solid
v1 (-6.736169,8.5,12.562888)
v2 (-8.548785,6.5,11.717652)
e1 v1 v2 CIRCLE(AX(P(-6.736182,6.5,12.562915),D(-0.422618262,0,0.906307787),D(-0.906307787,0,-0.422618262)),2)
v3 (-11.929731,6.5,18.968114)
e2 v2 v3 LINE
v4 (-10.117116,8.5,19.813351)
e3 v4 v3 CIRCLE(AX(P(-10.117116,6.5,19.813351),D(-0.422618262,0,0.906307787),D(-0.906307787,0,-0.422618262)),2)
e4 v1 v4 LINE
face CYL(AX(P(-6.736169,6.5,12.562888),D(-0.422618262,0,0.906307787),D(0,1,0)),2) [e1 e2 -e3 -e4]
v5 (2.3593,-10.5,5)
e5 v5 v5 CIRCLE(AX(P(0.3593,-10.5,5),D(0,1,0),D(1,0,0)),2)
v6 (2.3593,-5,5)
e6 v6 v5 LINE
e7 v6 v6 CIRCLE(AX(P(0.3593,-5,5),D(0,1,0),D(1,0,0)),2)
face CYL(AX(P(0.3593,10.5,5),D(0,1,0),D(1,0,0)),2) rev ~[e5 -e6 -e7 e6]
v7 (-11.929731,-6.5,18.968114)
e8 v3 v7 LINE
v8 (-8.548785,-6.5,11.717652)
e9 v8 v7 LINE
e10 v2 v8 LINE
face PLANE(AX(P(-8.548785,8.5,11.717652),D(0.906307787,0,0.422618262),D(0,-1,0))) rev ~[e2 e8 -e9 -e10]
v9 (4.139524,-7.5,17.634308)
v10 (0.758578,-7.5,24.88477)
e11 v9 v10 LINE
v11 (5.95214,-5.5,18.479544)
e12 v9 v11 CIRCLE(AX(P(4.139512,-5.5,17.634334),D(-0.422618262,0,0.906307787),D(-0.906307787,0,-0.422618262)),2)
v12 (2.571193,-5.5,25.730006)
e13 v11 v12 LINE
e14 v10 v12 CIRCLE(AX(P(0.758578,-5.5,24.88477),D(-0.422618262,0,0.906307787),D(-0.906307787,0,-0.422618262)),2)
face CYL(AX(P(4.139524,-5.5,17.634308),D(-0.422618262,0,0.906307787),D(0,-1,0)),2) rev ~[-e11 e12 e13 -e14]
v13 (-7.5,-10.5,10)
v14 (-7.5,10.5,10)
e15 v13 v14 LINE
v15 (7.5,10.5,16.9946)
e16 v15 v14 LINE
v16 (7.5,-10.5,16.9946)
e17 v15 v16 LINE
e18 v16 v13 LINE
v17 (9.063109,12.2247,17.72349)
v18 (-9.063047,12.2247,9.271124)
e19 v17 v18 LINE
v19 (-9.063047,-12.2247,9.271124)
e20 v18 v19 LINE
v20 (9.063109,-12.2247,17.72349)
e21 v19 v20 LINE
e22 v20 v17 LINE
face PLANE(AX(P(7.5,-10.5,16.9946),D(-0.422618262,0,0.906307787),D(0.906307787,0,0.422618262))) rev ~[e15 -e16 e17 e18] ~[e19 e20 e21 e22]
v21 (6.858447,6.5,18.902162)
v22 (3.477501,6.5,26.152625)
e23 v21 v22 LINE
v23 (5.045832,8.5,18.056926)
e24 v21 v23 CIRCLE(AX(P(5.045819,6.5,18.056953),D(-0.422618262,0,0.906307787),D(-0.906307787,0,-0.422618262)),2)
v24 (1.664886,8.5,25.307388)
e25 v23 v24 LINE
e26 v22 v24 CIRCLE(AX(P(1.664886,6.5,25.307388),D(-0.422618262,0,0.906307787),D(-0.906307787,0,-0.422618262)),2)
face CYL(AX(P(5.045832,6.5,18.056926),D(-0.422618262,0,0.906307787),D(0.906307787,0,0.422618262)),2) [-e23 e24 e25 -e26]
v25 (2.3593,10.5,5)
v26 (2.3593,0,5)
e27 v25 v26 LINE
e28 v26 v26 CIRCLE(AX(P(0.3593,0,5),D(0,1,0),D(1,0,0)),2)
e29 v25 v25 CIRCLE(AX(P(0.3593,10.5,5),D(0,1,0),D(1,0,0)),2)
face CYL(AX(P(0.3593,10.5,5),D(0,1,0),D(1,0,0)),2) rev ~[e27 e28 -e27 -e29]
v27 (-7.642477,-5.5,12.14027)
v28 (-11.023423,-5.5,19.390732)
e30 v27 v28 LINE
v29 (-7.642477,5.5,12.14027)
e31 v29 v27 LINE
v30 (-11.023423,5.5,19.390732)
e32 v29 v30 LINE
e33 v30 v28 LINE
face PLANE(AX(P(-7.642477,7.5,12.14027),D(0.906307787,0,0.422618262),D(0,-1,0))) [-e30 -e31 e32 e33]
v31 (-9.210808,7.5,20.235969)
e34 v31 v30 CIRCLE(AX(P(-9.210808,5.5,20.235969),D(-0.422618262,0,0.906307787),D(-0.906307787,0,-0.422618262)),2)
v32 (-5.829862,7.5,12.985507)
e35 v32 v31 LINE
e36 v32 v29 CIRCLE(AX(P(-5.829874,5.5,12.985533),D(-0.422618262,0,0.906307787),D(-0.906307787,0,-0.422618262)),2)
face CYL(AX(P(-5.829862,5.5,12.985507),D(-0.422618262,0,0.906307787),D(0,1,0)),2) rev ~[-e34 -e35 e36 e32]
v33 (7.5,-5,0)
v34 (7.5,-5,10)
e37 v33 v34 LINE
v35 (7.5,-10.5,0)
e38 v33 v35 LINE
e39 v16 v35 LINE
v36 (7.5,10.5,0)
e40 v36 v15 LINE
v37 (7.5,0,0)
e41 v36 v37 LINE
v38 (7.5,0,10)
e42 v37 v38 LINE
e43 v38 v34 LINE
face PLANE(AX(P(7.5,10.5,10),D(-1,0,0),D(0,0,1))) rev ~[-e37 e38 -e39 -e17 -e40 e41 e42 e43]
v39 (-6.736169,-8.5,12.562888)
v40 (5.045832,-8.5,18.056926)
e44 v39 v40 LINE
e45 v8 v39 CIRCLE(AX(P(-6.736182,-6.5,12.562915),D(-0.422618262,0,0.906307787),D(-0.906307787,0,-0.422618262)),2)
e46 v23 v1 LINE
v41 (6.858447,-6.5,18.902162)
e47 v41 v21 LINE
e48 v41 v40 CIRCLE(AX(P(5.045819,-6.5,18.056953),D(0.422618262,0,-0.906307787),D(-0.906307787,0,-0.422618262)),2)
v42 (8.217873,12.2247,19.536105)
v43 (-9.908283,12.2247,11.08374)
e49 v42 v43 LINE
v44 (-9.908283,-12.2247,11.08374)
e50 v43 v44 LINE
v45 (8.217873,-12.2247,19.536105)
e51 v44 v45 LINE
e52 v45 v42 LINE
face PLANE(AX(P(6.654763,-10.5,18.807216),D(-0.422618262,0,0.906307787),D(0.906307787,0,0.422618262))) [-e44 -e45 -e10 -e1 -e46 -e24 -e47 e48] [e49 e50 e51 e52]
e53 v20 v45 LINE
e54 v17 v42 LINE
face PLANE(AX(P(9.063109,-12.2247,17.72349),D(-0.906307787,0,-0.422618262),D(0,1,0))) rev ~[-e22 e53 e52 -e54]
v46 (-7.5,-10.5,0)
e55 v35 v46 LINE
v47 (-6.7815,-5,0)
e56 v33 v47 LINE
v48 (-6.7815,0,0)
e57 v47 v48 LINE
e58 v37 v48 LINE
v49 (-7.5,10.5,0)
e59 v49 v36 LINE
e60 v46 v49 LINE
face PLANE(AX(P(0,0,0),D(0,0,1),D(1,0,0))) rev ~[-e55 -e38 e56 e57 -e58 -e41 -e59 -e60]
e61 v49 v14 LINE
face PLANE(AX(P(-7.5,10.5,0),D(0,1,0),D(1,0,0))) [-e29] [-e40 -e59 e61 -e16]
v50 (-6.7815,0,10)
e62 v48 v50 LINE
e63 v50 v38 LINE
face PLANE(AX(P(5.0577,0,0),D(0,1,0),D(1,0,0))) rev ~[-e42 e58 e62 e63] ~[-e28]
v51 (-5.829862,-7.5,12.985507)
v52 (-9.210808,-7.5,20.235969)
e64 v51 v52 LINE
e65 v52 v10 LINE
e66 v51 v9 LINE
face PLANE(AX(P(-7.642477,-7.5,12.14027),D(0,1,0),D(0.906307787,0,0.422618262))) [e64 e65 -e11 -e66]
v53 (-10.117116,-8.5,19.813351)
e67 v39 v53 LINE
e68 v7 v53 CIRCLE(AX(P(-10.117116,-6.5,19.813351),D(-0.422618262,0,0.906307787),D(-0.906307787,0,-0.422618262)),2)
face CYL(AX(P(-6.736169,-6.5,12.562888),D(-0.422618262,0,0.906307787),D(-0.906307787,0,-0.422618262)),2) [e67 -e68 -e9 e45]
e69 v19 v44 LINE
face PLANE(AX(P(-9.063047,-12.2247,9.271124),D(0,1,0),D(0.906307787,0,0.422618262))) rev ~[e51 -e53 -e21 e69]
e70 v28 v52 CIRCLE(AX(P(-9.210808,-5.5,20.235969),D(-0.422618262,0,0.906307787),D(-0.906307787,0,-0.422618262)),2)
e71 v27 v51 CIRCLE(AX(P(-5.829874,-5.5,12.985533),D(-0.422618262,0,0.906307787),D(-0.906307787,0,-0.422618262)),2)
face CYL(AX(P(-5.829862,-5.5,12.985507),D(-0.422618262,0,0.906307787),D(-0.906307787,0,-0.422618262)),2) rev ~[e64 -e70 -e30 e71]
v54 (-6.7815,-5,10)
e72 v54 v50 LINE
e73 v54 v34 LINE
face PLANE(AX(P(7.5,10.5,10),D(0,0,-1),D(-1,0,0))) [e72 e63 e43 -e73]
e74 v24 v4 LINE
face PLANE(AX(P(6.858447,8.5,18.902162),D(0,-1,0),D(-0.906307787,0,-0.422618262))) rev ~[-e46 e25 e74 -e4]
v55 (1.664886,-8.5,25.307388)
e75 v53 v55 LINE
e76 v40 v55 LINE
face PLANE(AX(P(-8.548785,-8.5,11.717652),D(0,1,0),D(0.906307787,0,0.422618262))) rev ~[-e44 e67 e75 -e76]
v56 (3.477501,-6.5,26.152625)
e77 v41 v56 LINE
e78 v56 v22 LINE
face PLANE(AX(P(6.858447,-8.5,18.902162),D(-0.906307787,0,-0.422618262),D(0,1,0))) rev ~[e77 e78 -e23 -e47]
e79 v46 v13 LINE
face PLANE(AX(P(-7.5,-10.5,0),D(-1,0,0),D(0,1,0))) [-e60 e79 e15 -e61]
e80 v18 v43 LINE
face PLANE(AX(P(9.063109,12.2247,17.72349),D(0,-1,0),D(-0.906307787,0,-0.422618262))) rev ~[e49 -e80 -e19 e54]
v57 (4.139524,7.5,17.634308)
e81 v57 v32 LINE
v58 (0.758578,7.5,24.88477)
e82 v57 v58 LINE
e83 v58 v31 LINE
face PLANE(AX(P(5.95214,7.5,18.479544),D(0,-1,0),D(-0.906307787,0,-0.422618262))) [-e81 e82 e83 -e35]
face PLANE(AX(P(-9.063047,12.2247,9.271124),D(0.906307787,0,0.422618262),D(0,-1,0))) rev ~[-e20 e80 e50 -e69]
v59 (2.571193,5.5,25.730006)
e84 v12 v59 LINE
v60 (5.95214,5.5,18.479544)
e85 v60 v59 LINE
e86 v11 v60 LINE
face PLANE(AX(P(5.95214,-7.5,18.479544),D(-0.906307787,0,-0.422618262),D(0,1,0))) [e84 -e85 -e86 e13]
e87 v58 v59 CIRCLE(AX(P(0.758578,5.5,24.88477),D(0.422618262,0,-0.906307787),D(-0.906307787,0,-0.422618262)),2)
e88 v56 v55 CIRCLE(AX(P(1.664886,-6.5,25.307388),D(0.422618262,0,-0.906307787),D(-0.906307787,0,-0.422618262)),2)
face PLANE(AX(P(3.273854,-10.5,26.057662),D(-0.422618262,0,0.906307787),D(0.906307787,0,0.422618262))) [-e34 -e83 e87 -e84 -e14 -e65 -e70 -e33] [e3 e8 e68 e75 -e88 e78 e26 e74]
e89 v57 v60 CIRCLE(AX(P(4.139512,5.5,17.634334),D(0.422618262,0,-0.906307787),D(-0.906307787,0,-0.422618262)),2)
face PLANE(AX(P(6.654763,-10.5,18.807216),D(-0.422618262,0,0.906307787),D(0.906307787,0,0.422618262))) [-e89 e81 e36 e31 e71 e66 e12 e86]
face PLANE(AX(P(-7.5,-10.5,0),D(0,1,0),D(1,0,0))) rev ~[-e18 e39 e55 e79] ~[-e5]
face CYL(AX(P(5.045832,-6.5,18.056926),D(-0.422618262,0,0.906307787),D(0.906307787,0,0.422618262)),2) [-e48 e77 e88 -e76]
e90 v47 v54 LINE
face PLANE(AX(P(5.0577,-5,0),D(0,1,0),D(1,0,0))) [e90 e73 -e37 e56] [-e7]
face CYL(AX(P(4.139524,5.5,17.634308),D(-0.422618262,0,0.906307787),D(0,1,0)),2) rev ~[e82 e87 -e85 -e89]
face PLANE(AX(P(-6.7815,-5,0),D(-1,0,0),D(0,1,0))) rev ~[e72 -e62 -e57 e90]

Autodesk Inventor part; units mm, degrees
ref_plane "YZ Plane" through (0, 0, 0) normal (1, 0, 0) x (0, 1, 0)
ref_plane "XZ Plane" through (0, 0, 0) normal (0, 1, 0) x (-1, 0, 0)
ref_plane "XY Plane" through (0, 0, 0) normal (0, 0, 1) x (1, 0, 0)
sketch "Эскиз1" plane through (0, 0, 0) normal (0, 0, 1) x (1, 0, 0)
  line L0 (7.5, -5) -> (7.5, 0) projected
  line L1 (5.0577, -5) -> (7.5, -5) projected
  line L2 (5.0577, -5) -> (-4.3392, -5) projected
  line L3 (-6.7815, -5) -> (-4.3392, -5) projected
  line L4 (-6.7815, -5) -> (-6.7815, 0) projected
  line L5 (-6.7815, 0) -> (-4.3392, 0) projected
  line L6 (5.0577, 0) -> (-4.3392, 0) projected
  line L7 (5.0577, 0) -> (7.5, 0) projected
  line L8 (7.5, -10.5) -> (-7.5, -10.5) projected
  line L9 (7.5, 0) -> (-6.7815, 0) projected
  line L10 (7.5, 10.5) -> (7.5, 0) projected
  line L11 (-7.5, 10.5) -> (7.5, 10.5) projected
  line L12 (-7.5, -10.5) -> (-7.5, 10.5) projected
  line L13 (7.5, -10.5) -> (-7.5, -10.5) projected
  line L14 (7.5, -5) -> (7.5, -10.5) projected
  line L15 (7.5, -5) -> (-6.7815, -5) projected
  line L16 (-6.7815, -5) -> (-6.7815, 0) projected
  point P0 (0, 0)
extrude "Выдавливание1" add sketch "Эскиз1" along normal blind 10 contours L14 L8 L12 L11 L10 L7 L6 L5 L4 L3 L2 L1
sketch "Эскиз2" plane through (-7.5, 10.5, 0) normal (0, 1, 0) x (1, 0, 0)
  circle A0 centre (7.8593, -5) radius 2 projected
  point P0 (7.5, 0)
extrude "Выдавливание2" cut sketch "Эскиз2" against normal through all
sketch "Эскиз3" plane through (-7.5, 10.5, 0) normal (0, 1, 0) x (1, 0, 0)
  line L0 (15, -10) -> (0, -10) projected
  line L1 (15, -10) -> (15, -16.9946)
  line L2 (15, -16.9946) -> (0, -10)
  point P0 (7.5, 0)
  dimension "d5" = 25
extrude "Выдавливание3" add sketch "Эскиз3" against normal up to surface (21 mm away)
sketch "Эскиз4" plane through (7.5, -10.5, 16.9946) normal (-0.4226183, 0, 0.9063078) x (0.9063078, 0, 0.4226183)
  line L0 (-16.5507, 0) -> (0, 0) projected
  line L1 (0, 21) -> (0, 0) projected
  line L2 (-16.5507, 21) -> (0, 21) projected
  line L3 (-16.5507, 21) -> (-16.5507, 0) projected
  line L4 (-18.2753, -1.7247) -> (1.7247, -1.7247)
  line L5 (1.7247, -1.7247) -> (1.7247, 22.7247)
  line L6 (1.7247, 22.7247) -> (-18.2753, 22.7247)
  line L7 (-18.2753, 22.7247) -> (-18.2753, -1.7247)
  point P0 (-13.9795, 10.5)
  dimension "d8" = 20
extrude "Выдавливание4" add sketch "Эскиз4" along normal blind 2 contours L3 L2 L1 L0 | L7 L6 L5 L4
sketch "Эскиз5" plane through (6.6548, -10.5, 18.8072) normal (-0.4226183, 0, 0.9063078) x (0.9063078, 0, 0.4226183)
  line L0 (0.2247, 19) -> (-16.7753, 19)
  line L1 (-16.7753, 19) -> (-16.7753, 2)
  line L2 (-16.7753, 2) -> (0.2247, 2)
  line L3 (0.2247, 2) -> (0.2247, 19)
  line L4 (1.7247, -1.7247) -> (1.7247, 22.7247) projected
  line L5 (-18.2753, -1.7247) -> (1.7247, -1.7247) projected
  line L6 (-0.7753, 18) -> (-15.7753, 18)
  line L7 (-15.7753, 18) -> (-15.7753, 3)
  line L8 (-15.7753, 3) -> (-0.7753, 3)
  line L9 (-0.7753, 3) -> (-0.7753, 18)
  point P0 (-13.9795, 10.5)
  point P1 (0.2247, 10.5)
  point P2 (1.7247, 10.5)
  point P3 (-8.2753, 2)
  point P4 (-8.2753, -1.7247)
  dimension "d11" = 17
  dimension "d12" = 1
extrude "Выдавливание5" add sketch "Эскиз5" along normal blind 8
fillet "Сопряжение1" radius 2 8 edges at (5.1679, -8.5, 22.5274) (5.1679, 8.5, 22.5274) (-10.2393, 8.5, 15.3429) (-10.2393, -8.5, 15.3429) (-9.333, 7.5, 15.7655) (4.2616, 7.5, 22.1048) (-9.333, -7.5, 15.7655) (4.2616, -7.5, 22.1048)
sketch "Эскиз6" plane through (7.5, 0, 0) normal (1, 0, 0) x (0, 0, -1)
  point P0 (0, 0)
equation "\"degg\" = 65deg"
properties part number "base_65"
